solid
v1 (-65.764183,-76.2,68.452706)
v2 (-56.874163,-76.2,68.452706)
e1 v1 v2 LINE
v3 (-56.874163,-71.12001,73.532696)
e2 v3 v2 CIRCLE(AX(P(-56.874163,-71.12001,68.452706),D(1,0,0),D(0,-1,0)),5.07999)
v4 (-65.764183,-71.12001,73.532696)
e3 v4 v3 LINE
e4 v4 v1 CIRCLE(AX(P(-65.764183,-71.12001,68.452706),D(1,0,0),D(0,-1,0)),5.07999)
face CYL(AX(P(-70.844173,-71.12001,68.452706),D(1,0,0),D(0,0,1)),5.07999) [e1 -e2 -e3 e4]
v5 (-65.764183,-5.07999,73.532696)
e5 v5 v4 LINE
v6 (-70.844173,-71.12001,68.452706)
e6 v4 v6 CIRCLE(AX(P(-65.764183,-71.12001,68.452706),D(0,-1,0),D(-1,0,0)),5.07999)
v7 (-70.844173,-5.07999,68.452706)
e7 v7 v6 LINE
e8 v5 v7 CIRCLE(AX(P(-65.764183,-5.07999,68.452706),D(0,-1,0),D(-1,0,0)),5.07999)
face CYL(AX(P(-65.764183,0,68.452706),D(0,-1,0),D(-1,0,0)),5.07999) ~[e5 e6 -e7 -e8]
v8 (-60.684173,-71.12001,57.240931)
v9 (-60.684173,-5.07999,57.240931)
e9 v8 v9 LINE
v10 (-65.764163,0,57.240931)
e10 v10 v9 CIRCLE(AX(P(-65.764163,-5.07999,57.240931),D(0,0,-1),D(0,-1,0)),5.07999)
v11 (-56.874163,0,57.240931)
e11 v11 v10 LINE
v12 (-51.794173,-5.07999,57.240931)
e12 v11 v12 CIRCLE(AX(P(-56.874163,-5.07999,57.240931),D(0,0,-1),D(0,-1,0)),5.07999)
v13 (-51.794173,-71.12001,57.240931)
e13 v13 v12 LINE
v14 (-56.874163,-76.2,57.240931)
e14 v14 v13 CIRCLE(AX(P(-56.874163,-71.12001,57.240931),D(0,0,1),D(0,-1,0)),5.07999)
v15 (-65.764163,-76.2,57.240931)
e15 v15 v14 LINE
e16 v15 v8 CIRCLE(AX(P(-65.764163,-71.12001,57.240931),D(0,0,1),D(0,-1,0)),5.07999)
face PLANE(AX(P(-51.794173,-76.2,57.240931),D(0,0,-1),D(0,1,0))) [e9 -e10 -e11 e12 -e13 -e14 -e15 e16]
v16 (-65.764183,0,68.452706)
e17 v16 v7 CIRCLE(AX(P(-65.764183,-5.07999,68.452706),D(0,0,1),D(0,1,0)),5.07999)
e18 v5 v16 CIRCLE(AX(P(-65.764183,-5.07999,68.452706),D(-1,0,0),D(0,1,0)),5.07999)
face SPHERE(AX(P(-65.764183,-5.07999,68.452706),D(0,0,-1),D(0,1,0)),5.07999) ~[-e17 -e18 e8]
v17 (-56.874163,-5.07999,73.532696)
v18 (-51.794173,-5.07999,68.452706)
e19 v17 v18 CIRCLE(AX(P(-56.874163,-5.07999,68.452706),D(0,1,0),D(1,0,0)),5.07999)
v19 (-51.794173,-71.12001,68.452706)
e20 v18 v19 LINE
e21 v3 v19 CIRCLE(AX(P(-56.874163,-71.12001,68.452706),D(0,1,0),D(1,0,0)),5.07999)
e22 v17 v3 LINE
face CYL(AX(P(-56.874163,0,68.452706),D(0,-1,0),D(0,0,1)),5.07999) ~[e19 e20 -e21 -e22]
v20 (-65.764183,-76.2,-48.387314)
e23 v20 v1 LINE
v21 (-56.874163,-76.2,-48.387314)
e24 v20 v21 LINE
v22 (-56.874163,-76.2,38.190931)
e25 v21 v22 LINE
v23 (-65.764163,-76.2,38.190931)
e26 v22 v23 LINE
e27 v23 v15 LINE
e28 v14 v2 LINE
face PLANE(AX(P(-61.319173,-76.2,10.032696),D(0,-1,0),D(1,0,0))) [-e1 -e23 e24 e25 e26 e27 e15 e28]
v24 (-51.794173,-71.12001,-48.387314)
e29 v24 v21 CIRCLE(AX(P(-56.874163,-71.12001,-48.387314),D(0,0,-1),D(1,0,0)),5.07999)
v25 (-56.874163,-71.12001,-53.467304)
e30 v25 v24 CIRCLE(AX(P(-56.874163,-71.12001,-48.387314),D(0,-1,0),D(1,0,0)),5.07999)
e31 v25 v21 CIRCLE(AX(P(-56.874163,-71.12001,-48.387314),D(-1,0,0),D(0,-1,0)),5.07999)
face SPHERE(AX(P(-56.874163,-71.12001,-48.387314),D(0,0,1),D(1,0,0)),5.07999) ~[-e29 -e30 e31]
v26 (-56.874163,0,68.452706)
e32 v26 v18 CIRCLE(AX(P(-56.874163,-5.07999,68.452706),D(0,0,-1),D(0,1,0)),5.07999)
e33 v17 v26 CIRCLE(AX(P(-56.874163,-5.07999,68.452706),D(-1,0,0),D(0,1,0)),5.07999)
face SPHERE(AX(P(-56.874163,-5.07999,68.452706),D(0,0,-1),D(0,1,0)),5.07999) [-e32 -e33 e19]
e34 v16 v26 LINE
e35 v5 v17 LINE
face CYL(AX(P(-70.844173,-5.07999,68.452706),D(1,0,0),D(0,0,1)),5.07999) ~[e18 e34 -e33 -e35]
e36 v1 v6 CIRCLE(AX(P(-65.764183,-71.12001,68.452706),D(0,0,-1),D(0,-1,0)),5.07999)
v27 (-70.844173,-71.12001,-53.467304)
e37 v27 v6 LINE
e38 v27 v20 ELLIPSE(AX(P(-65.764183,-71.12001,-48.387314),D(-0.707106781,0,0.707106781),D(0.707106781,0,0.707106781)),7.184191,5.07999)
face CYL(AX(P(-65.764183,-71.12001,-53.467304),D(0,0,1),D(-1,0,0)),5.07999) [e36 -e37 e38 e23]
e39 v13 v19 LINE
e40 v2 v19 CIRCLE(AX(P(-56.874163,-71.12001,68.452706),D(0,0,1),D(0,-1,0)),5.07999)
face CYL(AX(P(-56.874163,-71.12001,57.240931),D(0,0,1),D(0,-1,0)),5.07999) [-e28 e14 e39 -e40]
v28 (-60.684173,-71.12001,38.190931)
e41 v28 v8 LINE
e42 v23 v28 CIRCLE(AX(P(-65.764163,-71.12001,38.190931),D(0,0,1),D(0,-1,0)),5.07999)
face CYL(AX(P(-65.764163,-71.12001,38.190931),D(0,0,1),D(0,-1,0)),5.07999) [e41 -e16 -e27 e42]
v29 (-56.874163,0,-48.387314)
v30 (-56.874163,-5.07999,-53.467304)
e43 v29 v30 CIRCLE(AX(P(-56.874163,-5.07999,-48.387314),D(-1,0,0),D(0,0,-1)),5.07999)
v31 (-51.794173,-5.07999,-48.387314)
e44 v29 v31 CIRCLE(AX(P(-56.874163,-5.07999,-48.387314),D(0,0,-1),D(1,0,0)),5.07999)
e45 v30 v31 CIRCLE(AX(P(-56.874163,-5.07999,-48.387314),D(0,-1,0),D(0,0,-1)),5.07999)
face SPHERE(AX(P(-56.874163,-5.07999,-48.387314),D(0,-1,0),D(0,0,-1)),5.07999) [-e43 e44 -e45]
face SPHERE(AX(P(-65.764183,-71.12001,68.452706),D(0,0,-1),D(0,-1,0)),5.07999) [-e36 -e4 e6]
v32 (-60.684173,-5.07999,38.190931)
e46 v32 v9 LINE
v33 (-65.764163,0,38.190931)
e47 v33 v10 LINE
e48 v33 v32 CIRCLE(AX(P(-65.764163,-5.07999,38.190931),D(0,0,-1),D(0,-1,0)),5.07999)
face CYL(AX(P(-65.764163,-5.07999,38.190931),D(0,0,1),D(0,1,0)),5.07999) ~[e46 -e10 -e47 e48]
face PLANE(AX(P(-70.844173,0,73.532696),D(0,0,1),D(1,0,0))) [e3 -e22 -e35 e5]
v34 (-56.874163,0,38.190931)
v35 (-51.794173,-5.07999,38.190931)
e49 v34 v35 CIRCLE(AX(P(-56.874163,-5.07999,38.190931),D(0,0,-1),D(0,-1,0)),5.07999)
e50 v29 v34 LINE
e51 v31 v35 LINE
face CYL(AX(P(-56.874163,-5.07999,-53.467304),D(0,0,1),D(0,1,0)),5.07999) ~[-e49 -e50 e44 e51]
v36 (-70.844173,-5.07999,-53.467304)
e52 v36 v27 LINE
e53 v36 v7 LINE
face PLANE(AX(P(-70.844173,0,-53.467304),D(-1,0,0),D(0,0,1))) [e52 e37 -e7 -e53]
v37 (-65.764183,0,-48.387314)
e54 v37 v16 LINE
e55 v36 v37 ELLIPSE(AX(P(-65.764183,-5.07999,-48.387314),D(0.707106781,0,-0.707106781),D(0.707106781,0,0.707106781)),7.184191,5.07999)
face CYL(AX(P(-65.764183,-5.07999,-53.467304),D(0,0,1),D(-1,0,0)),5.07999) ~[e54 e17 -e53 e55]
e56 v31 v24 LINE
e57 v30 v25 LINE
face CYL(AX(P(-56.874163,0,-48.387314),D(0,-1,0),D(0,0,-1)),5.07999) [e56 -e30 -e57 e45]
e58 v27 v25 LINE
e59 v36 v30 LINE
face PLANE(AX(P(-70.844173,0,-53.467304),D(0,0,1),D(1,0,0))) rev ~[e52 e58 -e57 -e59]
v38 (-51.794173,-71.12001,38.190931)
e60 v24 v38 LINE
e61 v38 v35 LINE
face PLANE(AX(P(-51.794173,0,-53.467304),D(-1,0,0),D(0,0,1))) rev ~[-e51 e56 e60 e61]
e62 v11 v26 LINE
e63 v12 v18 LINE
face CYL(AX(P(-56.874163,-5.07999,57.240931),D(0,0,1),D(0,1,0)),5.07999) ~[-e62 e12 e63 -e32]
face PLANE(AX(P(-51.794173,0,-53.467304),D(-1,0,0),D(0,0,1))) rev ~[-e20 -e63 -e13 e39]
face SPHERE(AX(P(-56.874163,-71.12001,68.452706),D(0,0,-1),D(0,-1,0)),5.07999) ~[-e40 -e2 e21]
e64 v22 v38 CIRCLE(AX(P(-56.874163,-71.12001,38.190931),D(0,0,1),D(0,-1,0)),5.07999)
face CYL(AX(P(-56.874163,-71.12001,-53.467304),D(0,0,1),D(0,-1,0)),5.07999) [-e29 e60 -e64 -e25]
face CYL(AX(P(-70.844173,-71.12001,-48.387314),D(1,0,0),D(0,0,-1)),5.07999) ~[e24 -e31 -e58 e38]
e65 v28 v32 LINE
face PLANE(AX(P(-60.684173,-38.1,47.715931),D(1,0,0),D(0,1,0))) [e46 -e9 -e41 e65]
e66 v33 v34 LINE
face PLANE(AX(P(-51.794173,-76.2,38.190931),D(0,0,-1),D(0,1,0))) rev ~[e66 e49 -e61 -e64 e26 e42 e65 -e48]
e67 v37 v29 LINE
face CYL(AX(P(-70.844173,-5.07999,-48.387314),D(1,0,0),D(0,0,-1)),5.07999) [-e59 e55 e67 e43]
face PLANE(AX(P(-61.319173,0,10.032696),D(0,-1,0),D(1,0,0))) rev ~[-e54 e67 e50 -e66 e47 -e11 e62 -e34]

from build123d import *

# Parameters (mm, degrees)
F0_W     = 19.05
F0_H     = 127
F1_DEPTH = 76.2
F2_W     = 76.2
F2_H     = 19.05
F3_DEPTH = 8.89
F4_R     = 5.07999


# Not quite as in the source:
# - a fillet or chamfer is up to 0.001 mm smaller than in the source, because OpenCascade refuses the exact size


with BuildPart() as f1:
    # F0 (on Front) → F1 (new body)
    with BuildSketch(Plane.XZ):
        with Locations((-61.3191734314, 10.0326964855)):
            Rectangle(F0_W, F0_H)
    extrude(amount=F1_DEPTH)

    # F2 (on face) → F3 (cut)
    with BuildSketch(Plane.YZ.offset(-51.7941734314)):
        with Locations((-38.1, 47.7159310818)):
            Rectangle(F2_W, F2_H)
    extrude(amount=-F3_DEPTH, mode=Mode.SUBTRACT)

    # F4 (radius 5.08 in the source; OpenCascade refuses exactly that, so slightly less here)
    f4_edges = [f1.edges().sort_by_distance(p)[0] for p in [
        (-70.844173, -76.2, 10.032696),
        (-51.794173, -76.2, 65.386814),
        (-61.319173, -76.2, 73.532696),
        (-60.684173, -76.2, 47.715931),
        (-60.684173, 0, 47.715931),
        (-51.794173, -76.2, -7.638186),
        (-51.794173, -38.1, -53.467304),
        (-61.319173, -76.2, -53.467304),
        (-61.319173, 0, -53.467304),
        (-51.794173, 0, -7.638186),
        (-70.844173, 0, 10.032696),
        (-51.794173, 0, 65.386814),
        (-61.319173, 0, 73.532696),
        (-51.794173, -38.1, 73.532696),
        (-70.844173, -38.1, 73.532696),
    ]]
    fillet(f4_edges, radius=F4_R)


solid = f1.part
